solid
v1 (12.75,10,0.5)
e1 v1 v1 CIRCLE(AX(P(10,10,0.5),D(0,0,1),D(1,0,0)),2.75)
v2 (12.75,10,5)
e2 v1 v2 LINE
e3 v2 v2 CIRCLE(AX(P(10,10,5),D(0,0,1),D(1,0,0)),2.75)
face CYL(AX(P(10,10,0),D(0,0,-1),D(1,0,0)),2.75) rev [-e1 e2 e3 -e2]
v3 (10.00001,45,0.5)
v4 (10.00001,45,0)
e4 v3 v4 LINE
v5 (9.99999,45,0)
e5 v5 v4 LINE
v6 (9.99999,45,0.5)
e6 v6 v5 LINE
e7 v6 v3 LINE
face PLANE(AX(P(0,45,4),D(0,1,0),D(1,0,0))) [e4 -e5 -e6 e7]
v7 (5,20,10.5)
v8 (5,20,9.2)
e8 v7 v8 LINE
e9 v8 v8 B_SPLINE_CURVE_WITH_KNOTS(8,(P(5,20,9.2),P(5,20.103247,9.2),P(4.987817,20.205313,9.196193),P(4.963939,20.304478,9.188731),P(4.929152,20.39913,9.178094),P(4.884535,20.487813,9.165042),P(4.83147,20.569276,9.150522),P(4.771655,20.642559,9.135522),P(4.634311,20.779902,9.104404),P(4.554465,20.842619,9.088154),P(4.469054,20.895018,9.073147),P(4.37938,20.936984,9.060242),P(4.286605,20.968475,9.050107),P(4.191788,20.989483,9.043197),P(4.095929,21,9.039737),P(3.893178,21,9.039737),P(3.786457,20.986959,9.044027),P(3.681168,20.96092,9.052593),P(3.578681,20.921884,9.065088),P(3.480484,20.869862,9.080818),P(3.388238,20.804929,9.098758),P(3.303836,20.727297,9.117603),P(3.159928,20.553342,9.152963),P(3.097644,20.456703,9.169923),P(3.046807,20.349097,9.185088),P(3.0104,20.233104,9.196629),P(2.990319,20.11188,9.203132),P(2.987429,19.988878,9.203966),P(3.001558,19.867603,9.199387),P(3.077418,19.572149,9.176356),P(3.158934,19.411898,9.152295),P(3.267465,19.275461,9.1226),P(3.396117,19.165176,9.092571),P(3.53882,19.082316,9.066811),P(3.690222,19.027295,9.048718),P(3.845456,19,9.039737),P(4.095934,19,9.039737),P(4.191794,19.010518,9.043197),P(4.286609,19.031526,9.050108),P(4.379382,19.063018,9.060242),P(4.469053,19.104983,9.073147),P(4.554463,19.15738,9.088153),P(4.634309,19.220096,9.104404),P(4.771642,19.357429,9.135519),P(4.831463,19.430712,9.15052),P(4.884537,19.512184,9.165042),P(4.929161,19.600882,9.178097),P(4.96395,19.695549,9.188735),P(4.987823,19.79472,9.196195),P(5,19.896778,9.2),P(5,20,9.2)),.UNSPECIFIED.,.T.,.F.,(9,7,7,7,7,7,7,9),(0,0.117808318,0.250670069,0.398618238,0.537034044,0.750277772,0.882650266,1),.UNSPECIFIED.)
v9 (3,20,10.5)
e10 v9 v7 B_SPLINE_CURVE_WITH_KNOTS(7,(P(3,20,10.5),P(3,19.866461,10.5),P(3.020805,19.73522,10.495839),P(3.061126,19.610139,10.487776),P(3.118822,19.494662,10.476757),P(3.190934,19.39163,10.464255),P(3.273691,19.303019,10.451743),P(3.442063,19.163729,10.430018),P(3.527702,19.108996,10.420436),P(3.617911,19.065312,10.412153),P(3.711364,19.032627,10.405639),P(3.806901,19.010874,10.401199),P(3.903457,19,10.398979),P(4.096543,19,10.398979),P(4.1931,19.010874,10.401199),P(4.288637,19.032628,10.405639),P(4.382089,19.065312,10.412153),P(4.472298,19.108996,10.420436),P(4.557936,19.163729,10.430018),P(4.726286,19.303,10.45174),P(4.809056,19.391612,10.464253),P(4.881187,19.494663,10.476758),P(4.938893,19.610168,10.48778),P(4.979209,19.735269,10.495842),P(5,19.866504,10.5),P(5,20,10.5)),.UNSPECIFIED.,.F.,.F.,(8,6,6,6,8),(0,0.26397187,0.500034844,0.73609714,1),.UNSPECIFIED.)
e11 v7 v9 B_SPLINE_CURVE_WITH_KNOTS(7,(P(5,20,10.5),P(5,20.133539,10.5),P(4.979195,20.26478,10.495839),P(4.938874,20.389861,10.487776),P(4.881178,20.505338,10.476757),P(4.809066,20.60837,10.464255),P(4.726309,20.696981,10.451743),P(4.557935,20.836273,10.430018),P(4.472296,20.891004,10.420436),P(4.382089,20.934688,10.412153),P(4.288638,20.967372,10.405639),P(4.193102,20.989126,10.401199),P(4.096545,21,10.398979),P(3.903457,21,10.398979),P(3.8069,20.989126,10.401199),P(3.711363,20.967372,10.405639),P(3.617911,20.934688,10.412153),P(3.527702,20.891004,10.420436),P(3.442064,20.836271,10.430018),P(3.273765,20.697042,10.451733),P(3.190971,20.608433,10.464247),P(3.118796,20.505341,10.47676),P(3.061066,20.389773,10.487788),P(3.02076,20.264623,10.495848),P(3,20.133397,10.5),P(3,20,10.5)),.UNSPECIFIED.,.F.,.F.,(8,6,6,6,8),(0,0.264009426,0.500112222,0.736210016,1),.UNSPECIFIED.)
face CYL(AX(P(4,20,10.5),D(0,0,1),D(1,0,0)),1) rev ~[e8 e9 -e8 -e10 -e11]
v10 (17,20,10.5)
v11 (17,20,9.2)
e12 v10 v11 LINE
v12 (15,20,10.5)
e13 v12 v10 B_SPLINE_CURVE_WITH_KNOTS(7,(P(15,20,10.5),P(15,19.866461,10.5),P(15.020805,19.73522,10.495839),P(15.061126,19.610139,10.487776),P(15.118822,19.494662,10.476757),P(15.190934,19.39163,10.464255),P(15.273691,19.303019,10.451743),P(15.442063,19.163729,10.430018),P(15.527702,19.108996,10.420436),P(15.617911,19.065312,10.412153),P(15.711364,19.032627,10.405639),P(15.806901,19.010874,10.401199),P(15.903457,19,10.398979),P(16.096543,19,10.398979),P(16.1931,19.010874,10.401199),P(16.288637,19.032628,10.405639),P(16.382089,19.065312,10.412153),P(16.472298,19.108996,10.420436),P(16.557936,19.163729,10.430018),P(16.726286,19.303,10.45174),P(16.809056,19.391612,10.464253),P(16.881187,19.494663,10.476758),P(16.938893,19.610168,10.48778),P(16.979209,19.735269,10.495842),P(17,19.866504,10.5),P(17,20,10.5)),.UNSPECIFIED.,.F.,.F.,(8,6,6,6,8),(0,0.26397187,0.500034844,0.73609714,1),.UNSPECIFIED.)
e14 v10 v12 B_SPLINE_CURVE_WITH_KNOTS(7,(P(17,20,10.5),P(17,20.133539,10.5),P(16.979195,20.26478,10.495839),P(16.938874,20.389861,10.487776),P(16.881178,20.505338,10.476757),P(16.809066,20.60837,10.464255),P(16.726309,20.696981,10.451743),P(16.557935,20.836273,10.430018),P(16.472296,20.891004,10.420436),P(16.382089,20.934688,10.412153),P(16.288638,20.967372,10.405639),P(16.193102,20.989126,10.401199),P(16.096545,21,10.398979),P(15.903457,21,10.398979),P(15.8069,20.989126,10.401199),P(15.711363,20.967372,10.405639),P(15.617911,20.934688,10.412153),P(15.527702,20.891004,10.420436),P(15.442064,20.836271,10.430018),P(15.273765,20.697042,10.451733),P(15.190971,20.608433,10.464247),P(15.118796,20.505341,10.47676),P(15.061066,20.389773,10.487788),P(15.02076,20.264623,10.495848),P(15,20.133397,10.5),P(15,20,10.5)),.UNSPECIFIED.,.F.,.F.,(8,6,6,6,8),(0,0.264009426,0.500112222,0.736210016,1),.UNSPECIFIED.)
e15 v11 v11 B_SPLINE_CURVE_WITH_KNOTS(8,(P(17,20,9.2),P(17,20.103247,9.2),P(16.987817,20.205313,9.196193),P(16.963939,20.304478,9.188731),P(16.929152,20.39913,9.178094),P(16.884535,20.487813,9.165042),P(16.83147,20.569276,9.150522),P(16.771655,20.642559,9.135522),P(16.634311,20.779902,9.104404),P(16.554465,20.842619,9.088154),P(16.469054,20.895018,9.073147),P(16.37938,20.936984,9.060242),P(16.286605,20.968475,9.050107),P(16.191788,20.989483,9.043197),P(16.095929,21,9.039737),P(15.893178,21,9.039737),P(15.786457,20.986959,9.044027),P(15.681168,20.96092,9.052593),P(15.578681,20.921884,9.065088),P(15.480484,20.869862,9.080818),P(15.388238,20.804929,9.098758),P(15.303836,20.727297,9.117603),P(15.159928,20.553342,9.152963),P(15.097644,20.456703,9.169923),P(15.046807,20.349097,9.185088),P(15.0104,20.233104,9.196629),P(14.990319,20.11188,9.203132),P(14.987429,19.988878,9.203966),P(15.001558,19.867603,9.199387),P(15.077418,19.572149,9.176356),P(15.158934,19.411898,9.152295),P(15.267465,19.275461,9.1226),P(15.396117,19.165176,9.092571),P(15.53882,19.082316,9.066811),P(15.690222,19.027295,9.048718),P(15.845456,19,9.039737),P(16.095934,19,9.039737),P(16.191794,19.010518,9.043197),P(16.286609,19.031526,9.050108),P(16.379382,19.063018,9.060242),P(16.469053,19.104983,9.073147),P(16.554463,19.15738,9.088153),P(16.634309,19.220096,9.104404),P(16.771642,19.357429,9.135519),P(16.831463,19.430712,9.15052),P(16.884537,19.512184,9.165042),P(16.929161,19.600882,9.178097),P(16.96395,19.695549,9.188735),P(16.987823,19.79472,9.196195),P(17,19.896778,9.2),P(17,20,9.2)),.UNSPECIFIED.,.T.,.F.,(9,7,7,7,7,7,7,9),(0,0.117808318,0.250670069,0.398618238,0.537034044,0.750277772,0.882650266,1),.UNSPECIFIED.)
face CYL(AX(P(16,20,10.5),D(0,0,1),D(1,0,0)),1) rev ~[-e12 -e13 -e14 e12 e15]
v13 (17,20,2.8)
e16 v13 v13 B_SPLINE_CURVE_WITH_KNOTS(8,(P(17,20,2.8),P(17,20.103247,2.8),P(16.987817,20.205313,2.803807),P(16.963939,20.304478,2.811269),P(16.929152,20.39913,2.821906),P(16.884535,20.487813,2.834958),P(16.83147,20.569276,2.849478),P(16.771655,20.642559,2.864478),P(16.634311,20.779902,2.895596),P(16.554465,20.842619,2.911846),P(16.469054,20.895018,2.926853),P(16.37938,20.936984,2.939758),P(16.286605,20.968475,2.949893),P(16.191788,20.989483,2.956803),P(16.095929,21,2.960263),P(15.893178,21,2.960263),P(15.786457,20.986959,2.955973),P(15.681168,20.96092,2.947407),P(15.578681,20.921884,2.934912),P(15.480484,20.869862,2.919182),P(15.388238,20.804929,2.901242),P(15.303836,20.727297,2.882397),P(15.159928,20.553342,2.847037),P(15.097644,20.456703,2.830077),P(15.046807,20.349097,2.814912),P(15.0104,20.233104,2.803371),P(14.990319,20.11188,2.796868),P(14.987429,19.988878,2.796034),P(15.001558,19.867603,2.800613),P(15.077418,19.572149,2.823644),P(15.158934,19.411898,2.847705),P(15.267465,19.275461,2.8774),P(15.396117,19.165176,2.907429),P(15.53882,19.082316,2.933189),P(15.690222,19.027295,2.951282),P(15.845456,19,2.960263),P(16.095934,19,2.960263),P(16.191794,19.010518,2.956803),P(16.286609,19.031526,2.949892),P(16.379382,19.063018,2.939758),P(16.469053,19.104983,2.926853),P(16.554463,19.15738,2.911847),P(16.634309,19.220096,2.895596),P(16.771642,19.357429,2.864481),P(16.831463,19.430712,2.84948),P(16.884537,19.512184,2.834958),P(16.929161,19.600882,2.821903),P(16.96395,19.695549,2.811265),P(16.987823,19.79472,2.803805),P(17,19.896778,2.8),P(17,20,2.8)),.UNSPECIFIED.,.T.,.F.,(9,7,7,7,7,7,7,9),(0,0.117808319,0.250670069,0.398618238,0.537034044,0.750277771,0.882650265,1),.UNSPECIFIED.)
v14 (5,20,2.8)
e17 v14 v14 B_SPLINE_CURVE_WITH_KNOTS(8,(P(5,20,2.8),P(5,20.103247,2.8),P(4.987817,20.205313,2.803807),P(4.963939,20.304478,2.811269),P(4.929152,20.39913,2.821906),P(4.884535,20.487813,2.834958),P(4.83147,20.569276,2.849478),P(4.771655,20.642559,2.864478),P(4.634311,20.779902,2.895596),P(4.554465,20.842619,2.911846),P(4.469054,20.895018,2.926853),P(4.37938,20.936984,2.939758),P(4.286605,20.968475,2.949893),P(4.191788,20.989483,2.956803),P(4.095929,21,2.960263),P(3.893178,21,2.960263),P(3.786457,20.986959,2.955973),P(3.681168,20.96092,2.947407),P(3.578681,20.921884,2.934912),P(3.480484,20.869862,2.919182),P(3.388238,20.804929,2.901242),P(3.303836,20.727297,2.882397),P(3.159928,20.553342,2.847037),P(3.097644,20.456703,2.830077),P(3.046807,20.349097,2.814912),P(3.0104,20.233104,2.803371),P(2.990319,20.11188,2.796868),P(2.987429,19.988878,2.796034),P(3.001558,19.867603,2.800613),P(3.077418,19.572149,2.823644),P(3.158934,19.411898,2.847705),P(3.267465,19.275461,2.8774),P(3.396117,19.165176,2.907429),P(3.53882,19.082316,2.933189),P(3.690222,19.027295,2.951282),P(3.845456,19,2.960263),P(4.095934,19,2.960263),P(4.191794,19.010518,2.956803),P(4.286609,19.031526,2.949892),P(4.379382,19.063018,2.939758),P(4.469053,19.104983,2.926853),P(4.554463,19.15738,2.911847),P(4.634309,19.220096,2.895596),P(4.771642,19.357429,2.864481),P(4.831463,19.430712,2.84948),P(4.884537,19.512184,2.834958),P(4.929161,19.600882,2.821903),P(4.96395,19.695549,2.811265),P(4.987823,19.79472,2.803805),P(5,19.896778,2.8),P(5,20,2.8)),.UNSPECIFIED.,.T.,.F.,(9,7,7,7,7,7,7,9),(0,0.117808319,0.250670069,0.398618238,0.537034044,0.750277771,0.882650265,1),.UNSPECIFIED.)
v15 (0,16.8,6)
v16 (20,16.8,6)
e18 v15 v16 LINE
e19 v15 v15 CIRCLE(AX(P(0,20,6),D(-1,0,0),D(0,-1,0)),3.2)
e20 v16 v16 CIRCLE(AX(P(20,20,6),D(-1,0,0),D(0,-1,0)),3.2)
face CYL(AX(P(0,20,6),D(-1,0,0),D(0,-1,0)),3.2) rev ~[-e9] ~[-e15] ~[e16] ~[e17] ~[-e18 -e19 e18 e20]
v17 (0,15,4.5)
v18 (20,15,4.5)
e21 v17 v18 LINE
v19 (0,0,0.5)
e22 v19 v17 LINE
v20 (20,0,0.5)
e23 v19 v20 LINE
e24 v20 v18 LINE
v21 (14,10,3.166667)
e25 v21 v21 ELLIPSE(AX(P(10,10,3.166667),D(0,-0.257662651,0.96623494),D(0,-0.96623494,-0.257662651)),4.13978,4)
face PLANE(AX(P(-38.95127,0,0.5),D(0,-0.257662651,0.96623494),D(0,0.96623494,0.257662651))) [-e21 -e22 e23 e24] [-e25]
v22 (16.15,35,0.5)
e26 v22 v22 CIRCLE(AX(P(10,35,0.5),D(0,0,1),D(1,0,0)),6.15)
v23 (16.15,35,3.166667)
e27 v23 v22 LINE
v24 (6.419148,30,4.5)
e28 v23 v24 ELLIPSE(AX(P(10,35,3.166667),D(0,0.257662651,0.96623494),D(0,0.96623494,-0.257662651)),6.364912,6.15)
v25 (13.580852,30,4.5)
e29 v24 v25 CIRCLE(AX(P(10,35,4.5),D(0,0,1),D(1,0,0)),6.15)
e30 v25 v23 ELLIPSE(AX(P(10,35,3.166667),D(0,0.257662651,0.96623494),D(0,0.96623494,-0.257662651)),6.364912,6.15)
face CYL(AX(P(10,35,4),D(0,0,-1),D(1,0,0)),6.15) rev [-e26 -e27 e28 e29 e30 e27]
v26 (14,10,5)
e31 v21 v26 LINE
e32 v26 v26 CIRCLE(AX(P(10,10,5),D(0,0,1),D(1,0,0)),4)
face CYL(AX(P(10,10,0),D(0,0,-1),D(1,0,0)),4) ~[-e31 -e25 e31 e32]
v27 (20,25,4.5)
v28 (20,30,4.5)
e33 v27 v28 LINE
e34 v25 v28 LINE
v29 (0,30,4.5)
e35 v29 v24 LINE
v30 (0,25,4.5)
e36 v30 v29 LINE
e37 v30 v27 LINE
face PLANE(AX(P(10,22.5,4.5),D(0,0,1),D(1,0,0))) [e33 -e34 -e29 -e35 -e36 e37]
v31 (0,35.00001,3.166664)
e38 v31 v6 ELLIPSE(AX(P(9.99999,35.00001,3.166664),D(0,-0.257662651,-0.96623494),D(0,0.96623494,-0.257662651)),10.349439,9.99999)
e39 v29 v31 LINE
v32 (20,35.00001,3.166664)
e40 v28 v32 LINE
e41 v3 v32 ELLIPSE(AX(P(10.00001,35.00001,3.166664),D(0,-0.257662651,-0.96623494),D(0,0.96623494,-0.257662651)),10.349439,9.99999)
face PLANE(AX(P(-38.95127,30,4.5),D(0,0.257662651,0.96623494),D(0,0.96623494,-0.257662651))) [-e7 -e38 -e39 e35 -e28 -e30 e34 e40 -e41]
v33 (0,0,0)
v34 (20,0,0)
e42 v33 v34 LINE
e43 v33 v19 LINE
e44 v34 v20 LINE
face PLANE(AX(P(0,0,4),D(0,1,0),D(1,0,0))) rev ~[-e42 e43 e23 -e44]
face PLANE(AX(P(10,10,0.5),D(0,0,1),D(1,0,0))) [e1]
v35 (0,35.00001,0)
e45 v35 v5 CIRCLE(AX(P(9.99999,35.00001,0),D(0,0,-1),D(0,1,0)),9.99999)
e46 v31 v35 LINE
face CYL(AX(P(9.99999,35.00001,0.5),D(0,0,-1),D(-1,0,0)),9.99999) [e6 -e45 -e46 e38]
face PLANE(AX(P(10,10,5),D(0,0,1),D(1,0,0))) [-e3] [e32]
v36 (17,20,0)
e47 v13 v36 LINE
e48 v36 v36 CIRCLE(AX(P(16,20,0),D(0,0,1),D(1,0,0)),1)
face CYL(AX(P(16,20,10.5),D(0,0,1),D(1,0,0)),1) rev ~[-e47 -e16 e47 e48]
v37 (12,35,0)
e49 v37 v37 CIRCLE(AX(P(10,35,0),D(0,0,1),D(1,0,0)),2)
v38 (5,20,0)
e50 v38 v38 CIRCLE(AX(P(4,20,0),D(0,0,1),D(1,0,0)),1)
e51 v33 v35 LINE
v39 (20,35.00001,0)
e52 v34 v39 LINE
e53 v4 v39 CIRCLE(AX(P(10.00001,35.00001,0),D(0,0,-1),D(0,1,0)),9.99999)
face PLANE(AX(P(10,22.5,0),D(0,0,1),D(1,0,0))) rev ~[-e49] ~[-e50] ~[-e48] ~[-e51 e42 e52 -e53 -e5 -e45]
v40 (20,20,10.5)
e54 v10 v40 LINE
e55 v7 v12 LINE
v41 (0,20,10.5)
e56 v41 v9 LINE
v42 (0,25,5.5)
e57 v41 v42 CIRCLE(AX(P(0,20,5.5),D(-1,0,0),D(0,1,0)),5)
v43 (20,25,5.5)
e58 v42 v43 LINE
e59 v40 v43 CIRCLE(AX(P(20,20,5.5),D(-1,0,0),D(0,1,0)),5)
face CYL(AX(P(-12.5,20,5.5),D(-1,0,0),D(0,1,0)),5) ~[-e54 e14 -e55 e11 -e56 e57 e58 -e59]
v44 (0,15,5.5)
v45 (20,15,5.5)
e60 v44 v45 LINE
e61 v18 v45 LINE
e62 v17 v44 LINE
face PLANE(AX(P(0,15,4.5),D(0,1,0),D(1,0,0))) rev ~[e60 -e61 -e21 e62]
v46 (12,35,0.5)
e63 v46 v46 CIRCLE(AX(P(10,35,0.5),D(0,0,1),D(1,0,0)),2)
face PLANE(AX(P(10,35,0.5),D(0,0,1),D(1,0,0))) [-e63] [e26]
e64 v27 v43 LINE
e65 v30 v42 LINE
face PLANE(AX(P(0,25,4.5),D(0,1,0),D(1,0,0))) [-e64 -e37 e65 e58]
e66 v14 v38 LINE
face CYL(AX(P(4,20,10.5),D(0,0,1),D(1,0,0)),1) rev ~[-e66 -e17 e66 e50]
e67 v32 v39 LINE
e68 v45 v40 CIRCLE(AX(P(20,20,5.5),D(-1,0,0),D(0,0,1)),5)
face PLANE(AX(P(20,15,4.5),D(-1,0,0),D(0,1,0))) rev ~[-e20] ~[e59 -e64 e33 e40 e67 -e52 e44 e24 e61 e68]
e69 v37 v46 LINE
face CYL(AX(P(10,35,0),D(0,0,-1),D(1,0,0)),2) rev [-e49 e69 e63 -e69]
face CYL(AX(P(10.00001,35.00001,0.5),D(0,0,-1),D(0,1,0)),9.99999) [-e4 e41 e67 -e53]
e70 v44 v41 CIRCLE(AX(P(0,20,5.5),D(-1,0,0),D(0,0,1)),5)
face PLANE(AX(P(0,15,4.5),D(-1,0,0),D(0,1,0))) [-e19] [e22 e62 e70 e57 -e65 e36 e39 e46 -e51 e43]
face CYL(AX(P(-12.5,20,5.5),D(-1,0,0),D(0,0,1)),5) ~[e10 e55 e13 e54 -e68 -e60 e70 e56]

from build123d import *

# Parameters (mm, degrees)
F0_W         = 20
F0_H         = 45
F0_R         = 4
F0_R_2       = 6.15
F1_DEPTH     = 4
F1_FACE_W    = 20
F1_FACE_H    = 45
F1_FACE_R    = 4
F1_FACE_R_2  = 6.15
F0_R_3       = 2
F0_R_4       = 2.75
F2_DEPTH     = 0.5
F4_T1_DEPTH  = 97.9025398997
F5_DEPTH     = 5
F3_W         = 20
F3_H         = 10
F6_DEPTH     = 6
F7_R         = 3.2
F8_DEPTH     = 25
F10_R        = 9.99999
F11_R        = 1
F12_DEPTH    = 25
F13_T1_DEPTH = 45


# Not quite as in the source:
# - a fillet or chamfer that OpenCascade refuses, or shapes differently, is made with other operations: its cross-section is extruded or revolved along the edge and cut away or added
# - a fillet or chamfer is up to 0.001 mm smaller than in the source, because OpenCascade refuses the exact size
# - a feature of the source that left no trace in its solid (it failed there, or was rolled back) is left out


with BuildPart() as f1:
    # F0 (on Top) → F1 (new body)
    with BuildSketch(Plane.XY):
        with Locations((10, 22.5)):
            Rectangle(F0_W, F0_H)
        with Locations((10, 10)):
            Circle(F0_R, mode=Mode.SUBTRACT)
        with Locations((10, 35)):
            Circle(F0_R_2, mode=Mode.SUBTRACT)
    extrude(amount=F1_DEPTH)

    # F1_face (on face) + F0 (on Top) → F2 (join)
    with BuildSketch(Plane(origin=(10, 21.3275360022, 4), x_dir=(1, 0, 0), z_dir=(0, 0, 1))):
        with Locations((0, 1.1724639978)):
            Rectangle(F1_FACE_W, F1_FACE_H)
        with Locations((0, -11.3275360022)):
            Circle(F1_FACE_R, mode=Mode.SUBTRACT)
        with Locations((0, 13.6724639978)):
            Circle(F1_FACE_R_2, mode=Mode.SUBTRACT)
    with BuildSketch(Plane.XY):
        with Locations((10, 35)):
            Circle(F0_R_2)
        with Locations((10, 35)):
            Circle(F0_R_3, mode=Mode.SUBTRACT)
        with Locations((10, 10)):
            Circle(F0_R_4)
    extrude(amount=F2_DEPTH)

    # F4: chamfer of 15 x 4 on 2 edges, made by hand

    # F4_s2 → F4_t1 (cut)
    with BuildSketch(Plane.YZ.offset(-38.9512699498)):
        Polygon((0, 0.5), (15, 4.5), (0, 4.5), align=None)
        Polygon((30, 4.5), (45, 0.5), (45, 4.5), align=None)
    extrude(amount=F4_T1_DEPTH, mode=Mode.SUBTRACT)

    # F0 (on Top) → F5 (join)
    with BuildSketch(Plane.XY):
        with Locations((10, 10)):
            Circle(F0_R)
        with Locations((10, 10)):
            Circle(F0_R_4, mode=Mode.SUBTRACT)
    extrude(amount=F5_DEPTH)

    # F3 (on face) → F6 (join)
    with BuildSketch(Plane.XY.offset(4.5)):
        with Locations((10, 20)):
            Rectangle(F3_W, F3_H)
    extrude(amount=F6_DEPTH)

    # F7 (on face) → F8 (cut)
    with BuildSketch(Plane(origin=(0, 0, 0), x_dir=(0, -1, 0), z_dir=(-1, 0, 0))):
        with Locations((-20, 6)):
            Circle(F7_R)
    extrude(amount=-F8_DEPTH, mode=Mode.SUBTRACT)

    # F10 (radius 10 in the source; OpenCascade refuses exactly that, so slightly less here)
    f10_edges = [f1.edges().sort_by_distance(p)[0] for p in [
        (0, 45, 0.25),
        (20, 45, 0.25),
    ]]
    fillet(f10_edges, radius=F10_R)

    # F11 (on face) → F12 (cut)
    with BuildSketch(Plane.XY.offset(10.5)):
        with Locations((4, 20)):
            Circle(F11_R)
        with Locations((16, 20)):
            Circle(F11_R)
    extrude(amount=-F12_DEPTH, mode=Mode.SUBTRACT)

    # F13: fillet of radius 5 on 2 edges, made by hand

    # F13_s2 → F13_t1 (cut)
    with BuildSketch(Plane.YZ.offset(-12.5)):
        with BuildLine():
            ThreePointArc((25, 5.5), (23.5355339059, 9.0355339059), (20, 10.5))
            Line((20, 10.5), (25, 10.5))
            Line((25, 10.5), (25, 5.5))
        make_face()
        with BuildLine():
            ThreePointArc((20, 10.5), (16.4644660941, 9.0355339059), (15, 5.5))
            Line((15, 5.5), (15, 10.5))
            Line((15, 10.5), (20, 10.5))
        make_face()
    extrude(amount=F13_T1_DEPTH, mode=Mode.SUBTRACT)


solid = f1.part
